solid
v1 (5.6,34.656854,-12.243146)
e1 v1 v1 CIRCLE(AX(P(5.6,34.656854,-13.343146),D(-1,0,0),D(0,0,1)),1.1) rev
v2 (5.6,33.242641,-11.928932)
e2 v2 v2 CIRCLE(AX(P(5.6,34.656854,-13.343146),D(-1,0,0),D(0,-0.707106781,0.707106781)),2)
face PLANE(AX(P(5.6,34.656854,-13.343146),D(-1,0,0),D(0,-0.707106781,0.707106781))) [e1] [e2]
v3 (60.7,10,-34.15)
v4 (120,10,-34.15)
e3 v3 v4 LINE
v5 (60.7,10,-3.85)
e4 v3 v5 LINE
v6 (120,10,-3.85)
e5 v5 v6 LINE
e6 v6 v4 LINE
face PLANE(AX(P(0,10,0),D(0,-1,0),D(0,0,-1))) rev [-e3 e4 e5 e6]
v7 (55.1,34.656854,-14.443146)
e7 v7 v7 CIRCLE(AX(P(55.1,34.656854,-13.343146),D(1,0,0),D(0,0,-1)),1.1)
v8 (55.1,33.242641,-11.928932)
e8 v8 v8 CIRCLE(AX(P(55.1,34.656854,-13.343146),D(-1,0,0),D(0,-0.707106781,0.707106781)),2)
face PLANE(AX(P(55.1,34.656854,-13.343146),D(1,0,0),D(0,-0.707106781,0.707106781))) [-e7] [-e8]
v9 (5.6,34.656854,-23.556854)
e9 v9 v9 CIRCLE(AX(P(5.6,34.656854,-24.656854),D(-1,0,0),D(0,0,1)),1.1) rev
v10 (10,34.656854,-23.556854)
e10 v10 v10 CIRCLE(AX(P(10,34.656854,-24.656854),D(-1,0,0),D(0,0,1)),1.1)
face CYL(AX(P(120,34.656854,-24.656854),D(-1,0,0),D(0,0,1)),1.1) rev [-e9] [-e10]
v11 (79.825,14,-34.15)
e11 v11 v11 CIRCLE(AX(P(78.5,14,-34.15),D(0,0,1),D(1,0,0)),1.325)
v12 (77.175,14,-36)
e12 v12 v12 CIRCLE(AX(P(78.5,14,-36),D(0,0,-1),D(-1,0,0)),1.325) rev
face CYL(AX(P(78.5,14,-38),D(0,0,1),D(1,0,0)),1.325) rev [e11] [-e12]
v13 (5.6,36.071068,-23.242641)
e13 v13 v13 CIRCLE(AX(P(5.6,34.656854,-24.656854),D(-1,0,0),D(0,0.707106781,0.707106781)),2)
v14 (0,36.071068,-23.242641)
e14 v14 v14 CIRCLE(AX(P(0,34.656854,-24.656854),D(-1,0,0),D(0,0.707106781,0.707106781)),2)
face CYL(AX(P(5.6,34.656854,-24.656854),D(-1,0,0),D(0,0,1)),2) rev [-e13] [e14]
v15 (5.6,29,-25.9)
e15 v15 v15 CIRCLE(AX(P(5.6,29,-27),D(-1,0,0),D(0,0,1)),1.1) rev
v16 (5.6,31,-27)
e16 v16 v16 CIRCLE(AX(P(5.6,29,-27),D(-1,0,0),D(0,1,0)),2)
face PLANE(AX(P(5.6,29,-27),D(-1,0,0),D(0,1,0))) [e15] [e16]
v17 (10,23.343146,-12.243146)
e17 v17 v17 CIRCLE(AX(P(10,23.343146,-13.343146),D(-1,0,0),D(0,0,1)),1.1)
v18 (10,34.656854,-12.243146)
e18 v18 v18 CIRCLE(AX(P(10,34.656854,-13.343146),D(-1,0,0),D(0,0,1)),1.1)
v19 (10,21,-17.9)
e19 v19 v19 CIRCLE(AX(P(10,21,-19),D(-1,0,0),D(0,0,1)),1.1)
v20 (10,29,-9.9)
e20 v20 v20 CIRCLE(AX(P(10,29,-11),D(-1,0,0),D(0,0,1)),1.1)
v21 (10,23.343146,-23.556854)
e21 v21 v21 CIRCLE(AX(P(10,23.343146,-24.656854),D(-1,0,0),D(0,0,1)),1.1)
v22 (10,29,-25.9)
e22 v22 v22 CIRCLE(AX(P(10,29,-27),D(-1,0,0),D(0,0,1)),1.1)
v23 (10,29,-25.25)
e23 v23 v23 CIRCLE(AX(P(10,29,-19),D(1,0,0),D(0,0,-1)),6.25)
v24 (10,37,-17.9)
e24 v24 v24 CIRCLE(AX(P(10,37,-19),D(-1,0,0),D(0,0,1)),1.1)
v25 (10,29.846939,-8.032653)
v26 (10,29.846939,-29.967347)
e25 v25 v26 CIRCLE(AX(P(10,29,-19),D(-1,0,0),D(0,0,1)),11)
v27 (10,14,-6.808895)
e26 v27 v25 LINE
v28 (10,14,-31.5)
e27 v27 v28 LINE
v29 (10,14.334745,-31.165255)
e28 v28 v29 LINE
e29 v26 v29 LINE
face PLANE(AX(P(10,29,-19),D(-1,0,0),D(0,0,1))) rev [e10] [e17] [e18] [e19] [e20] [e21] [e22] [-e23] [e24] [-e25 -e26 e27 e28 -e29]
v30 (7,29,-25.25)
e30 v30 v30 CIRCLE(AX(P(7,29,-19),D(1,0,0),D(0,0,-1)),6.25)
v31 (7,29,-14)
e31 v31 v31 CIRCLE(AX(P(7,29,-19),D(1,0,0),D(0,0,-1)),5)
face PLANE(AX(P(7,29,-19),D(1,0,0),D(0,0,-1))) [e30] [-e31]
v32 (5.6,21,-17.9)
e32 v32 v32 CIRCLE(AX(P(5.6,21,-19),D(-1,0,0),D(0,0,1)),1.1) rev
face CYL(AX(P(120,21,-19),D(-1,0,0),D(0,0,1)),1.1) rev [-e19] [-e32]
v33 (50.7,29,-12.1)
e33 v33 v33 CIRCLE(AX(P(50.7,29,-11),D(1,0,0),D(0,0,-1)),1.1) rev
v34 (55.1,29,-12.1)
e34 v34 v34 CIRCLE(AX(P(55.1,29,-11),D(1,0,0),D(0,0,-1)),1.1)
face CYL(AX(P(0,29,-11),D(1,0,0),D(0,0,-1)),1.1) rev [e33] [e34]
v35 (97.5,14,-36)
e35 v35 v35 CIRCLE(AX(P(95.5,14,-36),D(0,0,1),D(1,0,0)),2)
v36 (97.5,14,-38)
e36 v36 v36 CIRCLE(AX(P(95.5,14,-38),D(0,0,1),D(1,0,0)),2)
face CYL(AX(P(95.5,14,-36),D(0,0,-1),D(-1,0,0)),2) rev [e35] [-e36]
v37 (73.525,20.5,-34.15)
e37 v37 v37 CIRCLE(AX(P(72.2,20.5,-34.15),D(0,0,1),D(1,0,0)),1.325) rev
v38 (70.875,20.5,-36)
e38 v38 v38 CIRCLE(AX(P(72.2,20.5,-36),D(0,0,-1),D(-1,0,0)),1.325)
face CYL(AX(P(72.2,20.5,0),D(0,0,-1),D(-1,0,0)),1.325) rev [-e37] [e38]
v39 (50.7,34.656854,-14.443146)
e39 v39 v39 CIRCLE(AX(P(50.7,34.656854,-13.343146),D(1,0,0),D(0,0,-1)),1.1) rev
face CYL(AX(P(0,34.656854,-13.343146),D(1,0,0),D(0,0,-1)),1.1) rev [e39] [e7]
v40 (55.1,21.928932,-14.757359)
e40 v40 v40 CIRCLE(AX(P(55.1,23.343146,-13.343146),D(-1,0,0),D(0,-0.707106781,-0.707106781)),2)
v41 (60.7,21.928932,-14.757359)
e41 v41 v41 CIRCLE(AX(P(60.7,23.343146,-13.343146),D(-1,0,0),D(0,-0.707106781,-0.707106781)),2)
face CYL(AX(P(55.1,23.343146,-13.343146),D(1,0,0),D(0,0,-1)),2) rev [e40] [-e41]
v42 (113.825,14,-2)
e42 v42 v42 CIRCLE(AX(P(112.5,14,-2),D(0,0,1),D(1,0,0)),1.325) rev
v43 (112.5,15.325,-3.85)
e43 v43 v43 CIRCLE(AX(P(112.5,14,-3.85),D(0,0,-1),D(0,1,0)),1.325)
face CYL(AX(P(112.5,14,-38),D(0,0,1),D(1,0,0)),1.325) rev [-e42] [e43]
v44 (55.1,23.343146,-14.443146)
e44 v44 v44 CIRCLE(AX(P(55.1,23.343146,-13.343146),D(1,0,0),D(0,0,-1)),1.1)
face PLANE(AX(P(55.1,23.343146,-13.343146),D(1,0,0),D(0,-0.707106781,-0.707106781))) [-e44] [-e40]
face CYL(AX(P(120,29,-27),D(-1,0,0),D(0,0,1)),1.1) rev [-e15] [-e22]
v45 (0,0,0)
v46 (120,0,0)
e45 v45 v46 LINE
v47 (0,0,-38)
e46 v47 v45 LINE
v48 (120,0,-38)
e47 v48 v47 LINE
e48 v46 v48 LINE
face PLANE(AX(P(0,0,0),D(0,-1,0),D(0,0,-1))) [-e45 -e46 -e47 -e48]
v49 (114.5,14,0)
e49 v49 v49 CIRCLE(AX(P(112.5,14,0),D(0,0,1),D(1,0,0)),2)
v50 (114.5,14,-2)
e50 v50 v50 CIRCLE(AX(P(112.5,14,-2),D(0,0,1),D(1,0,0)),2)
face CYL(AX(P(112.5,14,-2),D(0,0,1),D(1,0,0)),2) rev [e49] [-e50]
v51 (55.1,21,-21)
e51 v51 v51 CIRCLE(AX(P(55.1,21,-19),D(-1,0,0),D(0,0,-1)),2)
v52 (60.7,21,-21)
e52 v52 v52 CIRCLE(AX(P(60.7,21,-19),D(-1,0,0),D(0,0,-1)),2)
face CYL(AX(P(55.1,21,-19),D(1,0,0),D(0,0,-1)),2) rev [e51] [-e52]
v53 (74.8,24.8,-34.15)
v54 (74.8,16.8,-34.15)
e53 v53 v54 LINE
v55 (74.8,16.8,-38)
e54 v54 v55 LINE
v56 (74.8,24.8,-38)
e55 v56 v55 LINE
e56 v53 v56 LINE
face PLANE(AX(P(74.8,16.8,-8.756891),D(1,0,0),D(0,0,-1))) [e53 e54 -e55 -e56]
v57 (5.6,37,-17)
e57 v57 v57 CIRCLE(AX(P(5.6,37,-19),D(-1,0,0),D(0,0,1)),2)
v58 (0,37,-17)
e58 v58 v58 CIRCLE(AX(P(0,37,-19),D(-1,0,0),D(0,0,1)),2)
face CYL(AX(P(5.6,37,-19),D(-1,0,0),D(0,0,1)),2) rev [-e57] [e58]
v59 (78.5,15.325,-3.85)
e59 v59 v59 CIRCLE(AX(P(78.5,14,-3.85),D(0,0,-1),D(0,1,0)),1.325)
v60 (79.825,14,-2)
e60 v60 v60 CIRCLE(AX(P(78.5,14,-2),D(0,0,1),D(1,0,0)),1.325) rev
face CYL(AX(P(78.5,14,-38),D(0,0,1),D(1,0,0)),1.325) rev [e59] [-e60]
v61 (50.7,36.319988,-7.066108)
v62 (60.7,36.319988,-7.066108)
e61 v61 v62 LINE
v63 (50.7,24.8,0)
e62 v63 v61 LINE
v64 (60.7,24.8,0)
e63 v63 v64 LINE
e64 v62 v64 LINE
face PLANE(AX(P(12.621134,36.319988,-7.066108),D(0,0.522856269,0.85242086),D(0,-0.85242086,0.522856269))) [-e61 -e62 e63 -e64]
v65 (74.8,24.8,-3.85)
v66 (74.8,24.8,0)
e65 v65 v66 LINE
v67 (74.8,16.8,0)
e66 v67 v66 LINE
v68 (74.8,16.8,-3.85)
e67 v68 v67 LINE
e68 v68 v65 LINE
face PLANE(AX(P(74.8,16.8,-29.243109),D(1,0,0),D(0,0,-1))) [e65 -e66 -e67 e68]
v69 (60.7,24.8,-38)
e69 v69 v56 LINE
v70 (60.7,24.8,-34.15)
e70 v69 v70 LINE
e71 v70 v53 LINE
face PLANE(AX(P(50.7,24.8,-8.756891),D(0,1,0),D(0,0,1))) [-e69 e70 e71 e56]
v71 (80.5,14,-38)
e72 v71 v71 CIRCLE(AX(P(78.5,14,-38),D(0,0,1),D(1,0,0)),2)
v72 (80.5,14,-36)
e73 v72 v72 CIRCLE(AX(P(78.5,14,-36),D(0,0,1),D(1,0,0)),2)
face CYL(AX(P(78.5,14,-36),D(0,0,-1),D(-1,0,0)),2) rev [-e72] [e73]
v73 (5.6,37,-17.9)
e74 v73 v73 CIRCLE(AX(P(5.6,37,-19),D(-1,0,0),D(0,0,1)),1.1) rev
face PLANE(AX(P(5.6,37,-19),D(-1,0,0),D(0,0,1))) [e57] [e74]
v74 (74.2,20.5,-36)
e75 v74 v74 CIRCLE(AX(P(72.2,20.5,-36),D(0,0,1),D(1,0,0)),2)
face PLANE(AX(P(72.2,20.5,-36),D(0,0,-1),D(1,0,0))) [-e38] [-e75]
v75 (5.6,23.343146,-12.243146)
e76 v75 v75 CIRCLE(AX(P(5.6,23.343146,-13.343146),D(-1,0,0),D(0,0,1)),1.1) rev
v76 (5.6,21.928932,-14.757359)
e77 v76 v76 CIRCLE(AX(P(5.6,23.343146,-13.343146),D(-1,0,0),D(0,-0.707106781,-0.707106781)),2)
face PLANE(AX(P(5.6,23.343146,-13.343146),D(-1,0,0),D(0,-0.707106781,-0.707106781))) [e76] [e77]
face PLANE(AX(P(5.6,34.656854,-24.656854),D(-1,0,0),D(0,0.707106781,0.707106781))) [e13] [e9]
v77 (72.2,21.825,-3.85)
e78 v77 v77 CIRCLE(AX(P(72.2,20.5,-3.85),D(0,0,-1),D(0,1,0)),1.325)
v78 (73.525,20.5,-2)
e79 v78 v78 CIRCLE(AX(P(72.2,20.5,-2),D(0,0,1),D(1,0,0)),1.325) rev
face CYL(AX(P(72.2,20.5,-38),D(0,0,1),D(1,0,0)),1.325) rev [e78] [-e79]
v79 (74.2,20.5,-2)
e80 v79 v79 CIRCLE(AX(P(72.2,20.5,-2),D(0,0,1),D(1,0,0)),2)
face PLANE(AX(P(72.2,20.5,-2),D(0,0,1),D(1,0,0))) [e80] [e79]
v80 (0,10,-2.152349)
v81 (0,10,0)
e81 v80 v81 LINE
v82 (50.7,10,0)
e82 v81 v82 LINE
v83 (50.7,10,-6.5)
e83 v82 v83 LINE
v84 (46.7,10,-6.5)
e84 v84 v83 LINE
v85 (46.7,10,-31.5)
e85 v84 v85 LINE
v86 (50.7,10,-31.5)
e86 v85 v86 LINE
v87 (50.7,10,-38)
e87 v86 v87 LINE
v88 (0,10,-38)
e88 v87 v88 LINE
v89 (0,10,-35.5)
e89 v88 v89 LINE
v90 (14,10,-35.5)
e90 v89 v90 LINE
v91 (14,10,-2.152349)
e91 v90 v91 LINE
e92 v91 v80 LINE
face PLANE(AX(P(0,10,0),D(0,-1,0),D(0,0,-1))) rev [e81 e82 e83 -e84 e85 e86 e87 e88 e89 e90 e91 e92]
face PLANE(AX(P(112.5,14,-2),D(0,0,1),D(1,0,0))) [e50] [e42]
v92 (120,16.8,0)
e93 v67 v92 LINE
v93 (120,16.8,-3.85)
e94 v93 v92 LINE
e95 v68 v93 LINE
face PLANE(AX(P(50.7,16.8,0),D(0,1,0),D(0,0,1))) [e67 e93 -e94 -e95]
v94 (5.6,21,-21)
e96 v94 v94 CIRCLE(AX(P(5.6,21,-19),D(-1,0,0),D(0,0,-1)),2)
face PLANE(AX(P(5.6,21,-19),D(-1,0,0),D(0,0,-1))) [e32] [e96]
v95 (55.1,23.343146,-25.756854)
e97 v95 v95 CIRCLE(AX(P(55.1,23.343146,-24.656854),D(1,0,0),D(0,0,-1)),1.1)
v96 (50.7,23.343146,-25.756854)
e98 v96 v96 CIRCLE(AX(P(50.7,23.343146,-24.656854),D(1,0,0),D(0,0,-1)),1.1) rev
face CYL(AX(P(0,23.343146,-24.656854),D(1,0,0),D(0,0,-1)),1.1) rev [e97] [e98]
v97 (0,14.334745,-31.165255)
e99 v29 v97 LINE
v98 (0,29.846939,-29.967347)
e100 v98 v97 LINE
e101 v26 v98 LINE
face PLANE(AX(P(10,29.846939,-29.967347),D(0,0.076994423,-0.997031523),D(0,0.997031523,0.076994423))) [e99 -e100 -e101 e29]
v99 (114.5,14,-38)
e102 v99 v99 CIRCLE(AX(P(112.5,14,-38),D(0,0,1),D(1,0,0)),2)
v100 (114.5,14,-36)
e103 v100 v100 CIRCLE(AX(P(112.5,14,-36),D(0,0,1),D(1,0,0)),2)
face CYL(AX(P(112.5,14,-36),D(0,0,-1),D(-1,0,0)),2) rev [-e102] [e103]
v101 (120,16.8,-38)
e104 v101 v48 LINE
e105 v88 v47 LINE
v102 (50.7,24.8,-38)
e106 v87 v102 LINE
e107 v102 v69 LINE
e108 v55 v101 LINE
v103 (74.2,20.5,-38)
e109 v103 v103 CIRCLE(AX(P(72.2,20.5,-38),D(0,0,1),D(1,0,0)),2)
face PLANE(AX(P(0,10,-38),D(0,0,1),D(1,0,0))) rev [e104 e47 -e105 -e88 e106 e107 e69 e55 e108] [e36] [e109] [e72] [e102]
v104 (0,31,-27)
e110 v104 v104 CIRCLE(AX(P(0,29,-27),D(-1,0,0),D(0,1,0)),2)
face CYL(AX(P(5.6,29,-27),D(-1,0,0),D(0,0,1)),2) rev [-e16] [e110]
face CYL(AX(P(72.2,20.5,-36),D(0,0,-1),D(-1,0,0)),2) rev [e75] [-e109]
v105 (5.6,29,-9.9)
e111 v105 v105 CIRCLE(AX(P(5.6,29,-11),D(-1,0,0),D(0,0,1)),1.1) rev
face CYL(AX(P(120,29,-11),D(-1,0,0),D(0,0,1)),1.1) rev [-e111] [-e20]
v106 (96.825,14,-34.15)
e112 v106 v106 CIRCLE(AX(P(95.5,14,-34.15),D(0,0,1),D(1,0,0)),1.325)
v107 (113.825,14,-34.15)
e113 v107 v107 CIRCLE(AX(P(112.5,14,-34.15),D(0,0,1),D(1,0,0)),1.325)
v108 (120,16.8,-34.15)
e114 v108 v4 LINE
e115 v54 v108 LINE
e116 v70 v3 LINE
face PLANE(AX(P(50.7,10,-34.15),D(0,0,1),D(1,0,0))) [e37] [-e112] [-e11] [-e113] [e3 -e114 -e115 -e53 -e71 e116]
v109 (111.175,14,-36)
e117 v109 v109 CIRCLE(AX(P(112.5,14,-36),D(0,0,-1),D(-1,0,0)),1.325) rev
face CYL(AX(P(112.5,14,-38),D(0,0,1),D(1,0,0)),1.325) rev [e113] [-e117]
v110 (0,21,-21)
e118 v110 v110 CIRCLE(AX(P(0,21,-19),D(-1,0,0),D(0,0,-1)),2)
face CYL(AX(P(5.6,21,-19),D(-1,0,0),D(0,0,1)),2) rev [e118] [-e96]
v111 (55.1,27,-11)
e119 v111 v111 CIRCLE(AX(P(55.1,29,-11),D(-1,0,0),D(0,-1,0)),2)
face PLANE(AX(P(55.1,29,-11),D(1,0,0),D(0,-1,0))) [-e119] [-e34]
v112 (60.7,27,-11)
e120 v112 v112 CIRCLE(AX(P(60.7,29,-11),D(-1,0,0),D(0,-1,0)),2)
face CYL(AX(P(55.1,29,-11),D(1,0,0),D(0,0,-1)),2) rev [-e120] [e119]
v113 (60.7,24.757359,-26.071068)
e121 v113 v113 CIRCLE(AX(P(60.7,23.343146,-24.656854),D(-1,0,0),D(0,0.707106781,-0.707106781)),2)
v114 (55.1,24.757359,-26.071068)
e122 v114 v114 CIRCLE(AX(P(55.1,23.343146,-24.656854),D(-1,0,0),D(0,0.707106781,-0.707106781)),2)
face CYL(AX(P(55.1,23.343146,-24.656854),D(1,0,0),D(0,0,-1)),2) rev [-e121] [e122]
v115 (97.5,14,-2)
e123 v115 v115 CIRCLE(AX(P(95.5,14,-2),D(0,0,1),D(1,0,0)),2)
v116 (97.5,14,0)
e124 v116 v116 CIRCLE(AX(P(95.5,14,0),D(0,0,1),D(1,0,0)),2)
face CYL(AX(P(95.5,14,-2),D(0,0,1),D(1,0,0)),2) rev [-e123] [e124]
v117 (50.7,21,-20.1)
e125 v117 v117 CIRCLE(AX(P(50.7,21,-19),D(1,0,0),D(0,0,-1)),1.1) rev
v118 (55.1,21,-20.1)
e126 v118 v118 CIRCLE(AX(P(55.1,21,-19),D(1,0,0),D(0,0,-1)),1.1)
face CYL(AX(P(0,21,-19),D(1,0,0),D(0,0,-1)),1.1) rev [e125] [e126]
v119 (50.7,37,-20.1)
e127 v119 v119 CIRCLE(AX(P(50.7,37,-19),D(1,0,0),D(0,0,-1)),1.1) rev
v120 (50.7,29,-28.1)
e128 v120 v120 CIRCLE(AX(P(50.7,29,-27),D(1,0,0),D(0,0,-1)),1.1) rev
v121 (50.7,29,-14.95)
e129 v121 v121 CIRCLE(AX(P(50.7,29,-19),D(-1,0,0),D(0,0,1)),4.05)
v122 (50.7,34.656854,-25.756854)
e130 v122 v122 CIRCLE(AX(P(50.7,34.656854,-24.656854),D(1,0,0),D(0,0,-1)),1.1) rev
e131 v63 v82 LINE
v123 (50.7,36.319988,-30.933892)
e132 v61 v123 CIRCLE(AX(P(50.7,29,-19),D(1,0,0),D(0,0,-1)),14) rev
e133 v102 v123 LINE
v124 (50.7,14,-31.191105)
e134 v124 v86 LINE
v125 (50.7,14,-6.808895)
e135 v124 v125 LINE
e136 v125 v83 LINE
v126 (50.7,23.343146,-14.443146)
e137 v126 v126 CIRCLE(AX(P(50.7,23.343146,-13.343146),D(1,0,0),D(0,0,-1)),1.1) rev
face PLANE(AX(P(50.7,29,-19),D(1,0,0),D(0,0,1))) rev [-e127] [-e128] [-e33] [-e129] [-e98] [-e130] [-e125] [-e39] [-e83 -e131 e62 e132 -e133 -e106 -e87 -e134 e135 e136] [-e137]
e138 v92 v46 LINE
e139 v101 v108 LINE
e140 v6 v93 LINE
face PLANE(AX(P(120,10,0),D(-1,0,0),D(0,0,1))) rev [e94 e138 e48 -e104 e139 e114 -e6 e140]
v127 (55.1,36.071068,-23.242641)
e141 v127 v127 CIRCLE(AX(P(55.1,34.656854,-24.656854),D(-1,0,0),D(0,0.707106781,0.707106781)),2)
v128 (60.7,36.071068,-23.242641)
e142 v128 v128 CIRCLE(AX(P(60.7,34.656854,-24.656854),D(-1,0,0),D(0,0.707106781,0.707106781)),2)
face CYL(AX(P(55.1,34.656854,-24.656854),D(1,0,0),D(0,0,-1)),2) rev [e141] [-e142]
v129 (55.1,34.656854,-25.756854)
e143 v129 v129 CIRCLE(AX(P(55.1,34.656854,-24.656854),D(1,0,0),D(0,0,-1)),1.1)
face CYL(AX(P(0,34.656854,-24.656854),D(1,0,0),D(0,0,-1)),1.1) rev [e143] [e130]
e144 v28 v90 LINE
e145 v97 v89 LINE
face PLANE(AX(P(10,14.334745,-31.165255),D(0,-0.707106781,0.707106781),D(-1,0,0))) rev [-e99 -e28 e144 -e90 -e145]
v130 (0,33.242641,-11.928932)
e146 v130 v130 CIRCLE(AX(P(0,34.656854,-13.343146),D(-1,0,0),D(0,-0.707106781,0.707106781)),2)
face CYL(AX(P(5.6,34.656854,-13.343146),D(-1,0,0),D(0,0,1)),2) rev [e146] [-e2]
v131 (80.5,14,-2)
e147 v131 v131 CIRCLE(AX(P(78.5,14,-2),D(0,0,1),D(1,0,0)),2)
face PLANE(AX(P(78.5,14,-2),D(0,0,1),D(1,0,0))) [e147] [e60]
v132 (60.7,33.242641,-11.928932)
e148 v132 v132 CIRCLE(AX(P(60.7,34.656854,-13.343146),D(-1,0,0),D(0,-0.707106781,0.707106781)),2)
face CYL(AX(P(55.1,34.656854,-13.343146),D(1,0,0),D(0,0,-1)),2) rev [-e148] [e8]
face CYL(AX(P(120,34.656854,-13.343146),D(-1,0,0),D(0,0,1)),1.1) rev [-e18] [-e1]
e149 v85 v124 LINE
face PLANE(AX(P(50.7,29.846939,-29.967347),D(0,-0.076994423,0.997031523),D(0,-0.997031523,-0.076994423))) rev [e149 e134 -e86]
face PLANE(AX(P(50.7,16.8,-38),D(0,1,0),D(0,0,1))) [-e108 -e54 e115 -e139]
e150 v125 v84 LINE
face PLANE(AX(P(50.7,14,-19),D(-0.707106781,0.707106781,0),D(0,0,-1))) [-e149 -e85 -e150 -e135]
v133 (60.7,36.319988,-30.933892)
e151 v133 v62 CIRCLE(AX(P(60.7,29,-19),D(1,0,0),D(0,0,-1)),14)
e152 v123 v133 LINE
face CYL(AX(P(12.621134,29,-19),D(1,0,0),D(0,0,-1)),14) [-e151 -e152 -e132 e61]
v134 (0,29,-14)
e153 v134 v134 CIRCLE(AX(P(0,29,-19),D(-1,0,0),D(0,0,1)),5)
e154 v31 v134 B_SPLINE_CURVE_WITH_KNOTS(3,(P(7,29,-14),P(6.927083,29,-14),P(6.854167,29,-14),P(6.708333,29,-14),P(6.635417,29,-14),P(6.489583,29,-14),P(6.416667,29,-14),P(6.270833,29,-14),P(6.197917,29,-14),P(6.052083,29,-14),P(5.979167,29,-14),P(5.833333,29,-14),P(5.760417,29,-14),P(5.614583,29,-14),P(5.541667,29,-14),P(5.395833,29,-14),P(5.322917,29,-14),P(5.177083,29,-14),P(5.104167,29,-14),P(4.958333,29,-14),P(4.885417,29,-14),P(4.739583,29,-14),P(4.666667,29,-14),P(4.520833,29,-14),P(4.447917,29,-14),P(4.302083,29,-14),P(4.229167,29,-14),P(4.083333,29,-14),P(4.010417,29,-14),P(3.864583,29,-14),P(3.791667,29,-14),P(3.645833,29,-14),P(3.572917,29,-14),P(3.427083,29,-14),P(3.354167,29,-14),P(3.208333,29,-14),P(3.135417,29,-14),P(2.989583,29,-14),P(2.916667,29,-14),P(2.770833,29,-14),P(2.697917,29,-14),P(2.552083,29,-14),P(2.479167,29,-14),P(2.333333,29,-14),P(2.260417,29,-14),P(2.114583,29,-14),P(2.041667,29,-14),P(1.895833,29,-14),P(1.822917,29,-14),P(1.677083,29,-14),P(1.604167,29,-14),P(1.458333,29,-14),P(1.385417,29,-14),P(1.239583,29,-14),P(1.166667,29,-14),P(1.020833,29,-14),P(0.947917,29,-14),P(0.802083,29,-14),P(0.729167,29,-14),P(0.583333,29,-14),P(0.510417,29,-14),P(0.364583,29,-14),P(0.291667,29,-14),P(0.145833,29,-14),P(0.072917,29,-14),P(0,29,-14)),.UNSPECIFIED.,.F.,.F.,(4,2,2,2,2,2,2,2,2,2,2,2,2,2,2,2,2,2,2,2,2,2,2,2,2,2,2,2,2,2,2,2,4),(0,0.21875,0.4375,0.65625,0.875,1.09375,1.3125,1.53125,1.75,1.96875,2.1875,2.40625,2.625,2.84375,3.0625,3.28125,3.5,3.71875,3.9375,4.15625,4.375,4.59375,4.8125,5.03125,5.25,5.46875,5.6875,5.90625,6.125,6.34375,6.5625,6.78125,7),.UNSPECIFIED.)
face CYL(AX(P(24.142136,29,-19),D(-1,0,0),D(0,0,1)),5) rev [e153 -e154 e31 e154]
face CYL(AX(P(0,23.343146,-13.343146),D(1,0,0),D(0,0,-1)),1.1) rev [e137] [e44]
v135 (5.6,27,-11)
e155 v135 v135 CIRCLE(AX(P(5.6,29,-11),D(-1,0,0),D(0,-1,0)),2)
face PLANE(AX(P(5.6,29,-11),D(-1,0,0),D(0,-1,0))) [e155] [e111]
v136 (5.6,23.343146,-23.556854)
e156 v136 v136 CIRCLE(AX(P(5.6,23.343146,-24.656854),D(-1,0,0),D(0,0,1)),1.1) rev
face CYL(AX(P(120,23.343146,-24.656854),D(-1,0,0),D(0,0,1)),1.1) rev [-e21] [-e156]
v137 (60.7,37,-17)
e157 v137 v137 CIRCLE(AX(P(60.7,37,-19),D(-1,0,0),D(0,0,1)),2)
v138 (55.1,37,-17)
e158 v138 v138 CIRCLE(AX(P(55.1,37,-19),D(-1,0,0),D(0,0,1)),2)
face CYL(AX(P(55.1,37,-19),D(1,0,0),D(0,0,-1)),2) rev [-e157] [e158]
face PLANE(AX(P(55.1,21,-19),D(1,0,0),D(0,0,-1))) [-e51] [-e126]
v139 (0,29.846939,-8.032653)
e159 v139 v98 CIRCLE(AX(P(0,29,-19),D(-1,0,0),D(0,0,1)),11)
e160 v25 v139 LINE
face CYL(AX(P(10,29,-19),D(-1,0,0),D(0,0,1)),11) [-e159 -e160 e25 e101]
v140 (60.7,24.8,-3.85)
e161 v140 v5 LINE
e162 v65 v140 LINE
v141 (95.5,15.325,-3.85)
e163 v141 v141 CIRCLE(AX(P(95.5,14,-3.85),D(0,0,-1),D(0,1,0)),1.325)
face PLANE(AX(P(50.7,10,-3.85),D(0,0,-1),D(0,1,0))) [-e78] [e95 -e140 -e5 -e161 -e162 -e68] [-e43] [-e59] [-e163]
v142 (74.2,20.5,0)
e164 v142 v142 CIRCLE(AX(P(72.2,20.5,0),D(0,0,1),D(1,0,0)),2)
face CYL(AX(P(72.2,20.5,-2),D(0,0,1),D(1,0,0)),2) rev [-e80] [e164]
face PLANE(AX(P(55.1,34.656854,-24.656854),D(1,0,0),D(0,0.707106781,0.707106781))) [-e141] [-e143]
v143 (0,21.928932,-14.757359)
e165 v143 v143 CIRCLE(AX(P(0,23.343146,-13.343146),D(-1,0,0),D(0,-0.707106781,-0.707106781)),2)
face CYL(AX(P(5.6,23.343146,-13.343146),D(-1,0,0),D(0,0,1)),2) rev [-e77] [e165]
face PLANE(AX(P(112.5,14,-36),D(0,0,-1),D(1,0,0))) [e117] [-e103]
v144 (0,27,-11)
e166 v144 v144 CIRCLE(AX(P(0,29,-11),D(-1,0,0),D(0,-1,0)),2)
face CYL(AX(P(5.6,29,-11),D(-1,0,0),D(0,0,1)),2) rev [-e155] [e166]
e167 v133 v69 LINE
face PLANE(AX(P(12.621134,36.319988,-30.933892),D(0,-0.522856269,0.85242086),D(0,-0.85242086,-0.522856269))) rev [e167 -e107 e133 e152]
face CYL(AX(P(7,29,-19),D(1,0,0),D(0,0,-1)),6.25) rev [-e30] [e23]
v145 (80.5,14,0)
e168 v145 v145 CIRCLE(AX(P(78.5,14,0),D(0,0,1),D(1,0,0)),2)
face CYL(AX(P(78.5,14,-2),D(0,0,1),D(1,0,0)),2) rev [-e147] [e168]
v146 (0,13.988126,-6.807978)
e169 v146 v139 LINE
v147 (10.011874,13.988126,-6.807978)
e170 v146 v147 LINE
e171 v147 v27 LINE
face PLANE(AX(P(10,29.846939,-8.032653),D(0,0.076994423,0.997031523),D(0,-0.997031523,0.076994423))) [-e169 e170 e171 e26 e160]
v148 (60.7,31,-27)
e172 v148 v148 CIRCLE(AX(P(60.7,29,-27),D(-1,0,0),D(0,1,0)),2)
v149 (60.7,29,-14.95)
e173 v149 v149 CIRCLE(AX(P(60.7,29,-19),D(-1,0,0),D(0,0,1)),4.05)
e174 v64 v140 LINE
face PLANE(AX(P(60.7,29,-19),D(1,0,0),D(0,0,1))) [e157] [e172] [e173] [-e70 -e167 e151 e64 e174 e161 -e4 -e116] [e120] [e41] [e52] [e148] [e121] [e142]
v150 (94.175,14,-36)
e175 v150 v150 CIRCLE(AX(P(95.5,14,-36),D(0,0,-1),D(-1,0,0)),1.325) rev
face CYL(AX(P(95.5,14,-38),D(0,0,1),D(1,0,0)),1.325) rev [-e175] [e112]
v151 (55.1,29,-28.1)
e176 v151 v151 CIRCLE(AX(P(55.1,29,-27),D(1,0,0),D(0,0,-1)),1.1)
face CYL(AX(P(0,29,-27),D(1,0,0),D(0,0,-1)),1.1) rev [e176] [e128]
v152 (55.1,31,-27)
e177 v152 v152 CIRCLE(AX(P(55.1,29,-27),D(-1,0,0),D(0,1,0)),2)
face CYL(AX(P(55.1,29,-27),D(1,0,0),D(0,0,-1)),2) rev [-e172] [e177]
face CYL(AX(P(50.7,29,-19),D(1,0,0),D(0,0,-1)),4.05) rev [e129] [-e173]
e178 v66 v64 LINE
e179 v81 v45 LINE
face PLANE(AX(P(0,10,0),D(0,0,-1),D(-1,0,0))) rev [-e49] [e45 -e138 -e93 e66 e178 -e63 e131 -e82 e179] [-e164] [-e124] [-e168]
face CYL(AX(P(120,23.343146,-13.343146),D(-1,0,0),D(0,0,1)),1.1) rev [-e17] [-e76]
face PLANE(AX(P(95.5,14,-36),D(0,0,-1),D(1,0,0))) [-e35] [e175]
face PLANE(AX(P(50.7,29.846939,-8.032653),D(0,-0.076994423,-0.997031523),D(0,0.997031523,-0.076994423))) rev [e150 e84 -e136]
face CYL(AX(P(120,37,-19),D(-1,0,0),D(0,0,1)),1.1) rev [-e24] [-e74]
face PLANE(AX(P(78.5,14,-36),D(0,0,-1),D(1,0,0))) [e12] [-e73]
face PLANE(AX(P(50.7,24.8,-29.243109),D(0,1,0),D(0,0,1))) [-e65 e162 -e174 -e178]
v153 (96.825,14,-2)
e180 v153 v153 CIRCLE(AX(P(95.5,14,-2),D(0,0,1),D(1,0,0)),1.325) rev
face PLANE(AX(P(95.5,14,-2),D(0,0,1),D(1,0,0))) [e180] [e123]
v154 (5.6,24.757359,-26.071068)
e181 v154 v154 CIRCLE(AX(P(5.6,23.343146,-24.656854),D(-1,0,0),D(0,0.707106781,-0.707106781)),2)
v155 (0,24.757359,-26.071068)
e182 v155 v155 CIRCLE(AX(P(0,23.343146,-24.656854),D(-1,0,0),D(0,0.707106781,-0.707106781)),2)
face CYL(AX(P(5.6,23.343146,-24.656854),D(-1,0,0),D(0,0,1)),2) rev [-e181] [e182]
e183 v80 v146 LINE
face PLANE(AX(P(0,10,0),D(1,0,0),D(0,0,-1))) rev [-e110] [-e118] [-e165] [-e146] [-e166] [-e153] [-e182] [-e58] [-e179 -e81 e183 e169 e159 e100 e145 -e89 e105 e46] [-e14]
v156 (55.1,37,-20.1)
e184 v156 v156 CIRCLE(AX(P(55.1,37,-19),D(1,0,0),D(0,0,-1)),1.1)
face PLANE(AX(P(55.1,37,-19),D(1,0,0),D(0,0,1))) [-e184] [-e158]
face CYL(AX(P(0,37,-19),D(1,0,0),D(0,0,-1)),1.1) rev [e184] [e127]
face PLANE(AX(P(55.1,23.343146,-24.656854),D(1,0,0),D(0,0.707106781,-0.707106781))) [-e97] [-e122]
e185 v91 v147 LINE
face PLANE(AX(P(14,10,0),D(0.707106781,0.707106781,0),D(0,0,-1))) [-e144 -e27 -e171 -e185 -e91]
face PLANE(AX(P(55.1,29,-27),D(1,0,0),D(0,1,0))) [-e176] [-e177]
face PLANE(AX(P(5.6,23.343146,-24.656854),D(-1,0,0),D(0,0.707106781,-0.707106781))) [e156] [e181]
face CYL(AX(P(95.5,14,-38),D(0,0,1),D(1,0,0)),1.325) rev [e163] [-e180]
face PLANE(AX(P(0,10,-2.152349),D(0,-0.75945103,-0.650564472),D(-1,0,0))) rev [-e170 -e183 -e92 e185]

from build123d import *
from OCP.BRepFilletAPI import BRepFilletAPI_MakeChamfer

# Parameters (mm, degrees)
SKETCH1_W                = 120
SKETCH1_H                = 38
BOSS_EXTRUDE1_DEPTH      = 10
SKETCH3_R                = 4.05
BOSS_EXTRUDE2_DEPTH      = 10
SKETCH4_R                = 1.1
CUT_EXTRUDE1_DEPTH       = 133.075735849
SKETCH5_R                = 2
CUT_EXTRUDE2_DEPTH       = 5.6
CIRPATTERN2_COUNT        = 8
MIRROR1_COPY_1_SKETCH_R  = 1.1
MIRROR1_COPY_1_DEPTH     = 133.075735849
MIRROR1_COPY_2_SKETCH_R  = 1.1
MIRROR1_COPY_2_DEPTH     = 133.075735849
MIRROR1_COPY_3_SKETCH_R  = 1.1
MIRROR1_COPY_3_DEPTH     = 133.075735849
MIRROR1_COPY_4_SKETCH_R  = 1.1
MIRROR1_COPY_4_DEPTH     = 133.075735849
MIRROR1_COPY_5_SKETCH_R  = 1.1
MIRROR1_COPY_5_DEPTH     = 133.075735849
MIRROR1_COPY_6_SKETCH_R  = 1.1
MIRROR1_COPY_6_DEPTH     = 133.075735849
MIRROR1_COPY_7_SKETCH_R  = 1.1
MIRROR1_COPY_7_DEPTH     = 133.075735849
MIRROR1_COPY_8_SKETCH_R  = 2
MIRROR1_COPY_8_DEPTH     = 5.6
MIRROR1_COPY_9_SKETCH_R  = 2
MIRROR1_COPY_9_DEPTH     = 5.6
MIRROR1_COPY_10_SKETCH_R = 2
MIRROR1_COPY_10_DEPTH    = 5.6
MIRROR1_COPY_11_SKETCH_R = 2
MIRROR1_COPY_11_DEPTH    = 5.6
MIRROR1_COPY_12_SKETCH_R = 2
MIRROR1_COPY_12_DEPTH    = 5.6
MIRROR1_COPY_13_SKETCH_R = 2
MIRROR1_COPY_13_DEPTH    = 5.6
MIRROR1_COPY_14_SKETCH_R = 2
MIRROR1_COPY_14_DEPTH    = 5.6
SKETCH6_W                = 3.85
SKETCH6_H                = 6.8
BOSS_EXTRUDE3_DEPTH      = 69.3
SKETCH7_R                = 1.325
CUT_EXTRUDE3_DEPTH       = 133.075735849
CHAMFER2_SIZE            = 4
CHAMFER2_SIZE2           = 4.347650763
CHAMFER3_SIZE            = 4
SKETCH10_W               = 24.1
SKETCH10_H               = 8
BOSS_EXTRUDE5_DEPTH      = 3.85
SKETCH12_R               = 1.325
CUT_EXTRUDE5_DEPTH       = 133.075735849
SKETCH13_R               = 2
CUT_EXTRUDE6_DEPTH       = 2
SKETCH14_W               = 24.1
SKETCH14_H               = 8
BOSS_EXTRUDE6_DEPTH      = 3.85
BOSS_EXTRUDE7_DEPTH      = 10
SKETCH17_R               = 6.25
CUT_EXTRUDE8_DEPTH       = 3
SKETCH18_R               = 5
CUT_EXTRUDE9_DEPTH       = 10


with BuildPart() as part:
    # Sketch1 → Boss-Extrude1 (new body)
    with BuildSketch(Plane(origin=(0, 0, 0), x_dir=(1, 0, 0), z_dir=(0, 1, 0))):
        with Locations((60, 19)):
            Rectangle(SKETCH1_W, SKETCH1_H)
    extrude(amount=BOSS_EXTRUDE1_DEPTH)

    # Sketch3 → Boss-Extrude2 (add)
    with BuildSketch(Plane.ZY):
        with BuildLine():
            Line((-29.967346758, 29.846938657), (-31.5, 10))
            Line((-31.5, 10), (-6.5, 10))
            Line((-6.5, 10), (-8.032653242, 29.846938657))
            ThreePointArc((-8.032653242, 29.846938657), (-19, 40), (-29.967346758, 29.846938657))
        make_face()
        with Locations((-19, 29)):
            Circle(SKETCH3_R, mode=Mode.SUBTRACT)
    boss_extrude2 = extrude(amount=-BOSS_EXTRUDE2_DEPTH)

    # Sketch4 → Cut-Extrude1 (cut, through all)
    with BuildSketch(Plane.ZY):
        with Locations((-19, 37)):
            Circle(SKETCH4_R)
    cut_extrude1 = extrude(amount=-CUT_EXTRUDE1_DEPTH, mode=Mode.SUBTRACT)

    # Sketch5 → Cut-Extrude2 (cut)
    with BuildSketch(Plane.ZY):
        with Locations((-19, 37)):
            Circle(SKETCH5_R)
    cut_extrude2 = extrude(amount=-CUT_EXTRUDE2_DEPTH, mode=Mode.SUBTRACT)

    # CirPattern2: Cut-Extrude1, Cut-Extrude2 ×8 about axis
    cirpattern2_axis = Axis((0, 29, -19), (1, 0, 0))
    add([cut_extrude1.rotate(cirpattern2_axis, i * 360 / CIRPATTERN2_COUNT) for i in range(1, CIRPATTERN2_COUNT)], mode=Mode.SUBTRACT)
    add([cut_extrude2.rotate(cirpattern2_axis, i * 360 / CIRPATTERN2_COUNT) for i in range(1, CIRPATTERN2_COUNT)], mode=Mode.SUBTRACT)

    # Mirror1: Boss-Extrude2, Cut-Extrude1, Cut-Extrude2 across plane
    add(boss_extrude2.mirror(Plane(origin=(30.35, 0, 0), x_dir=(0, 0, 1), z_dir=(1, 0, 0))))
    add(cut_extrude1.mirror(Plane(origin=(30.35, 0, 0), x_dir=(0, 0, 1), z_dir=(1, 0, 0))), mode=Mode.SUBTRACT)
    add(cut_extrude2.mirror(Plane(origin=(30.35, 0, 0), x_dir=(0, 0, 1), z_dir=(1, 0, 0))), mode=Mode.SUBTRACT)

    # Mirror1 copy 1 sketch → Mirror1 copy 1 (cut, through all)
    with BuildSketch(Plane(origin=(60.7, -4.941125497, -26.071067812), x_dir=(0, -0.7071067811865475, 0.7071067811865476), z_dir=(1, 0, 0))):
        with Locations((-19, -37)):
            Circle(MIRROR1_COPY_1_SKETCH_R)
    extrude(amount=-MIRROR1_COPY_1_DEPTH, mode=Mode.SUBTRACT)

    # Mirror1 copy 2 sketch → Mirror1 copy 2 (cut, through all)
    with BuildSketch(Plane(origin=(60.7, 10, -48), x_dir=(0, -1, 0), z_dir=(1, 0, 0))):
        with Locations((-19, -37)):
            Circle(MIRROR1_COPY_2_SKETCH_R)
    extrude(amount=-MIRROR1_COPY_2_DEPTH, mode=Mode.SUBTRACT)

    # Mirror1 copy 3 sketch → Mirror1 copy 3 (cut, through all)
    with BuildSketch(Plane(origin=(60.7, 36.071067812, -52.941125497), x_dir=(0, -0.7071067811865476, -0.7071067811865475), z_dir=(1, 0, 0))):
        with Locations((-19, -37)):
            Circle(MIRROR1_COPY_3_SKETCH_R)
    extrude(amount=-MIRROR1_COPY_3_DEPTH, mode=Mode.SUBTRACT)

    # Mirror1 copy 4 sketch → Mirror1 copy 4 (cut, through all)
    with BuildSketch(Plane(origin=(60.7, 58, -38), x_dir=(0, 0, -1), z_dir=(1, 0, 0))):
        with Locations((-19, -37)):
            Circle(MIRROR1_COPY_4_SKETCH_R)
    extrude(amount=-MIRROR1_COPY_4_DEPTH, mode=Mode.SUBTRACT)

    # Mirror1 copy 5 sketch → Mirror1 copy 5 (cut, through all)
    with BuildSketch(Plane(origin=(60.7, 62.941125497, -11.928932188), x_dir=(0, 0.7071067811865475, -0.7071067811865477), z_dir=(1, 0, 0))):
        with Locations((-19, -37)):
            Circle(MIRROR1_COPY_5_SKETCH_R)
    extrude(amount=-MIRROR1_COPY_5_DEPTH, mode=Mode.SUBTRACT)

    # Mirror1 copy 6 sketch → Mirror1 copy 6 (cut, through all)
    with BuildSketch(Plane(origin=(60.7, 48, 10), x_dir=(0, 1, 0), z_dir=(1, 0, 0))):
        with Locations((-19, -37)):
            Circle(MIRROR1_COPY_6_SKETCH_R)
    extrude(amount=-MIRROR1_COPY_6_DEPTH, mode=Mode.SUBTRACT)

    # Mirror1 copy 7 sketch → Mirror1 copy 7 (cut, through all)
    with BuildSketch(Plane(origin=(60.7, 21.928932188, 14.941125497), x_dir=(0, 0.7071067811865477, 0.7071067811865474), z_dir=(1, 0, 0))):
        with Locations((-19, -37)):
            Circle(MIRROR1_COPY_7_SKETCH_R)
    extrude(amount=-MIRROR1_COPY_7_DEPTH, mode=Mode.SUBTRACT)

    # Mirror1 copy 8 sketch → Mirror1 copy 8 (cut)
    with BuildSketch(Plane(origin=(60.7, -4.941125497, -26.071067812), x_dir=(0, -0.7071067811865475, 0.7071067811865476), z_dir=(1, 0, 0))):
        with Locations((-19, -37)):
            Circle(MIRROR1_COPY_8_SKETCH_R)
    extrude(amount=-MIRROR1_COPY_8_DEPTH, mode=Mode.SUBTRACT)

    # Mirror1 copy 9 sketch → Mirror1 copy 9 (cut)
    with BuildSketch(Plane(origin=(60.7, 10, -48), x_dir=(0, -1, 0), z_dir=(1, 0, 0))):
        with Locations((-19, -37)):
            Circle(MIRROR1_COPY_9_SKETCH_R)
    extrude(amount=-MIRROR1_COPY_9_DEPTH, mode=Mode.SUBTRACT)

    # Mirror1 copy 10 sketch → Mirror1 copy 10 (cut)
    with BuildSketch(Plane(origin=(60.7, 36.071067812, -52.941125497), x_dir=(0, -0.7071067811865476, -0.7071067811865475), z_dir=(1, 0, 0))):
        with Locations((-19, -37)):
            Circle(MIRROR1_COPY_10_SKETCH_R)
    extrude(amount=-MIRROR1_COPY_10_DEPTH, mode=Mode.SUBTRACT)

    # Mirror1 copy 11 sketch → Mirror1 copy 11 (cut)
    with BuildSketch(Plane(origin=(60.7, 58, -38), x_dir=(0, 0, -1), z_dir=(1, 0, 0))):
        with Locations((-19, -37)):
            Circle(MIRROR1_COPY_11_SKETCH_R)
    extrude(amount=-MIRROR1_COPY_11_DEPTH, mode=Mode.SUBTRACT)

    # Mirror1 copy 12 sketch → Mirror1 copy 12 (cut)
    with BuildSketch(Plane(origin=(60.7, 62.941125497, -11.928932188), x_dir=(0, 0.7071067811865475, -0.7071067811865477), z_dir=(1, 0, 0))):
        with Locations((-19, -37)):
            Circle(MIRROR1_COPY_12_SKETCH_R)
    extrude(amount=-MIRROR1_COPY_12_DEPTH, mode=Mode.SUBTRACT)

    # Mirror1 copy 13 sketch → Mirror1 copy 13 (cut)
    with BuildSketch(Plane(origin=(60.7, 48, 10), x_dir=(0, 1, 0), z_dir=(1, 0, 0))):
        with Locations((-19, -37)):
            Circle(MIRROR1_COPY_13_SKETCH_R)
    extrude(amount=-MIRROR1_COPY_13_DEPTH, mode=Mode.SUBTRACT)

    # Mirror1 copy 14 sketch → Mirror1 copy 14 (cut)
    with BuildSketch(Plane(origin=(60.7, 21.928932188, 14.941125497), x_dir=(0, 0.7071067811865477, 0.7071067811865474), z_dir=(1, 0, 0))):
        with Locations((-19, -37)):
            Circle(MIRROR1_COPY_14_SKETCH_R)
    extrude(amount=-MIRROR1_COPY_14_DEPTH, mode=Mode.SUBTRACT)

    # Sketch6 → Boss-Extrude3 (add)
    with BuildSketch(Plane(origin=(120, 0, 0), x_dir=(0, 0, -1), z_dir=(1, 0, 0))):
        with Locations((1.925, 13.4)):
            Rectangle(SKETCH6_W, SKETCH6_H)
        with Locations((36.075, 13.4)):
            Rectangle(SKETCH6_W, SKETCH6_H)
    extrude(amount=-BOSS_EXTRUDE3_DEPTH)

    # Sketch7 → Cut-Extrude3 (cut, through all)
    with BuildSketch(Plane.XY):
        with Locations((112.5, 14)):
            Circle(SKETCH7_R)
        with Locations((95.5, 14)):
            Circle(SKETCH7_R)
        with Locations((78.5, 14)):
            Circle(SKETCH7_R)
    extrude(amount=-CUT_EXTRUDE3_DEPTH, mode=Mode.SUBTRACT)

    # Chamfer2: one chamfer whose edges measure the first distance from different faces: ONE call of the kernel's chamfer builder (chamfer() names one face for all edges)
    chamfer2_edges_1 = [part.edges().sort_by_distance(p)[0] for p in [
        (5, 10, -6.5),
    ]]
    chamfer2_side_1 = [part.faces().sort_by_distance(p)[0] for p in [
        (5, 19.923469328, -7.266326621),
    ]]
    chamfer2_edges_2 = [part.edges().sort_by_distance(p)[0] for p in [
        (5, 10, -31.5),
    ]]
    chamfer2_side_2 = [part.faces().sort_by_distance(p)[0] for p in [
        (5, 10, -5.241270482),
    ]]
    chamfer2 = BRepFilletAPI_MakeChamfer(part.part.solid().wrapped)
    for e in chamfer2_edges_1:
        chamfer2.Add(CHAMFER2_SIZE, CHAMFER2_SIZE2, e.wrapped, chamfer2_side_1[0].wrapped)  # the first distance lies on this face
    for e in chamfer2_edges_2:
        chamfer2.Add(CHAMFER2_SIZE, CHAMFER2_SIZE2, e.wrapped, chamfer2_side_2[0].wrapped)  # the first distance lies on this face
    add(Compound.cast(chamfer2.Shape()), mode=Mode.REPLACE)

    # Chamfer3
    # the kernel refuses this chamfer: 4 mm, written as the material it adds along each edge
    with BuildSketch(Plane(origin=(10, 10, -45.786731952), x_dir=(-0.027495876610586487, 0.9996219169112968, 0), z_dir=(0, 0, 1))) as chamfer3_piece_1_section:
        Polygon((CHAMFER3_SIZE * 0.999621916911, -CHAMFER3_SIZE * 0.0274958766106), (-CHAMFER3_SIZE * 0.0274958766106, -CHAMFER3_SIZE * 0.999621916911), (0, 0), align=None)
    chamfer3_piece_1 = extrude(amount=53.921114666, mode=Mode.PRIVATE)
    chamfer3_piece_1 = split(chamfer3_piece_1, bisect_by=Plane(origin=(11.350702775, 12.358006535, -6.682093895), z_dir=(0, -0.07699442332997536, -0.9970315234615627)), keep=Keep.TOP, mode=Mode.PRIVATE)
    chamfer3_piece_1 = split(chamfer3_piece_1, bisect_by=Plane(origin=(11.350702775, 18.198875274, -27.301124726), z_dir=(0, -0.7071067811865462, 0.7071067811865488)), keep=Keep.TOP, mode=Mode.PRIVATE)
    add(chamfer3_piece_1)
    with BuildSketch(Plane(origin=(10, 10, -45.786731952), x_dir=(-0.027495876610586487, 0.9996219169112968, 0), z_dir=(0, 0, 1))) as chamfer3_piece_2_section:
        Polygon((CHAMFER3_SIZE * 0.999621916911, -CHAMFER3_SIZE * 0.0274958766106), (-CHAMFER3_SIZE * 0.0274958766106, -CHAMFER3_SIZE * 0.999621916911), (0, 0), align=None)
    chamfer3_piece_2 = extrude(amount=53.921114666, mode=Mode.PRIVATE)
    chamfer3_piece_2 = split(chamfer3_piece_2, bisect_by=Plane(origin=(11.500745419, 11.803630686, -4.257857977), z_dir=(0, -0.7594510301465996, -0.6505644724462508)), keep=Keep.TOP, mode=Mode.PRIVATE)
    chamfer3_piece_2 = split(chamfer3_piece_2, bisect_by=Plane(origin=(11.500745419, 25.775482122, -19.724517878), z_dir=(0, -0.7071067811865462, 0.7071067811865488)), keep=Keep.TOP, mode=Mode.PRIVATE)
    add(chamfer3_piece_2)
    with BuildSketch(Plane(origin=(50.7, 10, -41.786731952), x_dir=(-0.9996219169112968, -0.02749587661058651, 0), z_dir=(0, 0, 1))) as chamfer3_piece_3_section:
        Polygon((CHAMFER3_SIZE * 0.999621916911, -CHAMFER3_SIZE * 0.0274958766106), (-CHAMFER3_SIZE * 0.0274958766106, -CHAMFER3_SIZE * 0.999621916911), (0, 0), align=None)
    chamfer3_piece_3 = extrude(amount=45.573463904, mode=Mode.PRIVATE)
    chamfer3_piece_3 = split(chamfer3_piece_3, bisect_by=Plane(origin=(49.363898132, 12.279498239, -6.676031197), z_dir=(0, -0.07699442332997536, -0.9970315234615627)), keep=Keep.TOP, mode=Mode.PRIVATE)
    chamfer3_piece_3 = split(chamfer3_piece_3, bisect_by=Plane(origin=(49.363898132, 12.279498239, -31.323968803), z_dir=(0, -0.07699442332997532, 0.9970315234615627)), keep=Keep.TOP, mode=Mode.PRIVATE)
    add(chamfer3_piece_3)

    # Sketch10 → Boss-Extrude5 (add)
    with BuildSketch(Plane.XY):
        with Locations((62.75, 20.8)):
            Rectangle(SKETCH10_W, SKETCH10_H)
    extrude(amount=-BOSS_EXTRUDE5_DEPTH)

    # Sketch12 → Cut-Extrude5 (cut, through all)
    with BuildSketch(Plane.XY):
        with Locations((72.2, 20.5)):
            Circle(SKETCH12_R)
    cut_extrude5 = extrude(amount=-CUT_EXTRUDE5_DEPTH, mode=Mode.SUBTRACT)

    # Sketch13 → Cut-Extrude6 (cut)
    with BuildSketch(Plane.XY):
        with Locations((112.5, 14)):
            Circle(SKETCH13_R)
        with Locations((95.5, 14)):
            Circle(SKETCH13_R)
        with Locations((78.5, 14)):
            Circle(SKETCH13_R)
        with Locations((72.2, 20.5)):
            Circle(SKETCH13_R)
    cut_extrude6 = extrude(amount=-CUT_EXTRUDE6_DEPTH, mode=Mode.SUBTRACT)

    # Sketch14 → Boss-Extrude6 (add)
    with BuildSketch(Plane(origin=(0, 0, -38), x_dir=(-1, 0, 0), z_dir=(0, 0, -1))):
        with Locations((-62.75, 20.8)):
            Rectangle(SKETCH14_W, SKETCH14_H)
    extrude(amount=-BOSS_EXTRUDE6_DEPTH)

    # Sketch15 → Boss-Extrude7 (add)
    with BuildSketch(Plane(origin=(60.7, 0, 0), x_dir=(0, 0, -1), z_dir=(1, 0, 0))):
        with BuildLine():
            Line((0, 24.8), (3.85, 24.8))
            Line((3.85, 24.8), (3.85, 10))
            Line((3.85, 10), (6.5, 10))
            Line((6.5, 10), (8.032653242, 29.846938657))
            ThreePointArc((8.032653242, 29.846938657), (11.527260383, 37.072060617), (19, 40))
            Line((19, 40), (19, 43))
            ThreePointArc((19, 43), (12.161865341, 41.216378939), (7.066107967, 36.319987769))
            Line((7.066107967, 36.319987769), (0, 24.8))
        make_face()
    boss_extrude7 = extrude(amount=-BOSS_EXTRUDE7_DEPTH)

    # Mirror7: Cut-Extrude5, Cut-Extrude6, Boss-Extrude7 across plane
    add(cut_extrude5.mirror(Plane.XY.offset(-19)), mode=Mode.SUBTRACT)
    add(cut_extrude6.mirror(Plane.XY.offset(-19)), mode=Mode.SUBTRACT)
    add(boss_extrude7.mirror(Plane.XY.offset(-19)))

    # Sketch17 → Cut-Extrude8 (cut)
    with BuildSketch(Plane(origin=(10, 0, 0), x_dir=(0, 0, -1), z_dir=(1, 0, 0))):
        with Locations((19, 29)):
            Circle(SKETCH17_R)
    extrude(amount=-CUT_EXTRUDE8_DEPTH, mode=Mode.SUBTRACT)

    # Sketch18 → Cut-Extrude9 (cut)
    with BuildSketch(Plane.ZY):
        with Locations((-19, 29)):
            Circle(SKETCH18_R)
    extrude(amount=-CUT_EXTRUDE9_DEPTH, mode=Mode.SUBTRACT)


solid = part.part
